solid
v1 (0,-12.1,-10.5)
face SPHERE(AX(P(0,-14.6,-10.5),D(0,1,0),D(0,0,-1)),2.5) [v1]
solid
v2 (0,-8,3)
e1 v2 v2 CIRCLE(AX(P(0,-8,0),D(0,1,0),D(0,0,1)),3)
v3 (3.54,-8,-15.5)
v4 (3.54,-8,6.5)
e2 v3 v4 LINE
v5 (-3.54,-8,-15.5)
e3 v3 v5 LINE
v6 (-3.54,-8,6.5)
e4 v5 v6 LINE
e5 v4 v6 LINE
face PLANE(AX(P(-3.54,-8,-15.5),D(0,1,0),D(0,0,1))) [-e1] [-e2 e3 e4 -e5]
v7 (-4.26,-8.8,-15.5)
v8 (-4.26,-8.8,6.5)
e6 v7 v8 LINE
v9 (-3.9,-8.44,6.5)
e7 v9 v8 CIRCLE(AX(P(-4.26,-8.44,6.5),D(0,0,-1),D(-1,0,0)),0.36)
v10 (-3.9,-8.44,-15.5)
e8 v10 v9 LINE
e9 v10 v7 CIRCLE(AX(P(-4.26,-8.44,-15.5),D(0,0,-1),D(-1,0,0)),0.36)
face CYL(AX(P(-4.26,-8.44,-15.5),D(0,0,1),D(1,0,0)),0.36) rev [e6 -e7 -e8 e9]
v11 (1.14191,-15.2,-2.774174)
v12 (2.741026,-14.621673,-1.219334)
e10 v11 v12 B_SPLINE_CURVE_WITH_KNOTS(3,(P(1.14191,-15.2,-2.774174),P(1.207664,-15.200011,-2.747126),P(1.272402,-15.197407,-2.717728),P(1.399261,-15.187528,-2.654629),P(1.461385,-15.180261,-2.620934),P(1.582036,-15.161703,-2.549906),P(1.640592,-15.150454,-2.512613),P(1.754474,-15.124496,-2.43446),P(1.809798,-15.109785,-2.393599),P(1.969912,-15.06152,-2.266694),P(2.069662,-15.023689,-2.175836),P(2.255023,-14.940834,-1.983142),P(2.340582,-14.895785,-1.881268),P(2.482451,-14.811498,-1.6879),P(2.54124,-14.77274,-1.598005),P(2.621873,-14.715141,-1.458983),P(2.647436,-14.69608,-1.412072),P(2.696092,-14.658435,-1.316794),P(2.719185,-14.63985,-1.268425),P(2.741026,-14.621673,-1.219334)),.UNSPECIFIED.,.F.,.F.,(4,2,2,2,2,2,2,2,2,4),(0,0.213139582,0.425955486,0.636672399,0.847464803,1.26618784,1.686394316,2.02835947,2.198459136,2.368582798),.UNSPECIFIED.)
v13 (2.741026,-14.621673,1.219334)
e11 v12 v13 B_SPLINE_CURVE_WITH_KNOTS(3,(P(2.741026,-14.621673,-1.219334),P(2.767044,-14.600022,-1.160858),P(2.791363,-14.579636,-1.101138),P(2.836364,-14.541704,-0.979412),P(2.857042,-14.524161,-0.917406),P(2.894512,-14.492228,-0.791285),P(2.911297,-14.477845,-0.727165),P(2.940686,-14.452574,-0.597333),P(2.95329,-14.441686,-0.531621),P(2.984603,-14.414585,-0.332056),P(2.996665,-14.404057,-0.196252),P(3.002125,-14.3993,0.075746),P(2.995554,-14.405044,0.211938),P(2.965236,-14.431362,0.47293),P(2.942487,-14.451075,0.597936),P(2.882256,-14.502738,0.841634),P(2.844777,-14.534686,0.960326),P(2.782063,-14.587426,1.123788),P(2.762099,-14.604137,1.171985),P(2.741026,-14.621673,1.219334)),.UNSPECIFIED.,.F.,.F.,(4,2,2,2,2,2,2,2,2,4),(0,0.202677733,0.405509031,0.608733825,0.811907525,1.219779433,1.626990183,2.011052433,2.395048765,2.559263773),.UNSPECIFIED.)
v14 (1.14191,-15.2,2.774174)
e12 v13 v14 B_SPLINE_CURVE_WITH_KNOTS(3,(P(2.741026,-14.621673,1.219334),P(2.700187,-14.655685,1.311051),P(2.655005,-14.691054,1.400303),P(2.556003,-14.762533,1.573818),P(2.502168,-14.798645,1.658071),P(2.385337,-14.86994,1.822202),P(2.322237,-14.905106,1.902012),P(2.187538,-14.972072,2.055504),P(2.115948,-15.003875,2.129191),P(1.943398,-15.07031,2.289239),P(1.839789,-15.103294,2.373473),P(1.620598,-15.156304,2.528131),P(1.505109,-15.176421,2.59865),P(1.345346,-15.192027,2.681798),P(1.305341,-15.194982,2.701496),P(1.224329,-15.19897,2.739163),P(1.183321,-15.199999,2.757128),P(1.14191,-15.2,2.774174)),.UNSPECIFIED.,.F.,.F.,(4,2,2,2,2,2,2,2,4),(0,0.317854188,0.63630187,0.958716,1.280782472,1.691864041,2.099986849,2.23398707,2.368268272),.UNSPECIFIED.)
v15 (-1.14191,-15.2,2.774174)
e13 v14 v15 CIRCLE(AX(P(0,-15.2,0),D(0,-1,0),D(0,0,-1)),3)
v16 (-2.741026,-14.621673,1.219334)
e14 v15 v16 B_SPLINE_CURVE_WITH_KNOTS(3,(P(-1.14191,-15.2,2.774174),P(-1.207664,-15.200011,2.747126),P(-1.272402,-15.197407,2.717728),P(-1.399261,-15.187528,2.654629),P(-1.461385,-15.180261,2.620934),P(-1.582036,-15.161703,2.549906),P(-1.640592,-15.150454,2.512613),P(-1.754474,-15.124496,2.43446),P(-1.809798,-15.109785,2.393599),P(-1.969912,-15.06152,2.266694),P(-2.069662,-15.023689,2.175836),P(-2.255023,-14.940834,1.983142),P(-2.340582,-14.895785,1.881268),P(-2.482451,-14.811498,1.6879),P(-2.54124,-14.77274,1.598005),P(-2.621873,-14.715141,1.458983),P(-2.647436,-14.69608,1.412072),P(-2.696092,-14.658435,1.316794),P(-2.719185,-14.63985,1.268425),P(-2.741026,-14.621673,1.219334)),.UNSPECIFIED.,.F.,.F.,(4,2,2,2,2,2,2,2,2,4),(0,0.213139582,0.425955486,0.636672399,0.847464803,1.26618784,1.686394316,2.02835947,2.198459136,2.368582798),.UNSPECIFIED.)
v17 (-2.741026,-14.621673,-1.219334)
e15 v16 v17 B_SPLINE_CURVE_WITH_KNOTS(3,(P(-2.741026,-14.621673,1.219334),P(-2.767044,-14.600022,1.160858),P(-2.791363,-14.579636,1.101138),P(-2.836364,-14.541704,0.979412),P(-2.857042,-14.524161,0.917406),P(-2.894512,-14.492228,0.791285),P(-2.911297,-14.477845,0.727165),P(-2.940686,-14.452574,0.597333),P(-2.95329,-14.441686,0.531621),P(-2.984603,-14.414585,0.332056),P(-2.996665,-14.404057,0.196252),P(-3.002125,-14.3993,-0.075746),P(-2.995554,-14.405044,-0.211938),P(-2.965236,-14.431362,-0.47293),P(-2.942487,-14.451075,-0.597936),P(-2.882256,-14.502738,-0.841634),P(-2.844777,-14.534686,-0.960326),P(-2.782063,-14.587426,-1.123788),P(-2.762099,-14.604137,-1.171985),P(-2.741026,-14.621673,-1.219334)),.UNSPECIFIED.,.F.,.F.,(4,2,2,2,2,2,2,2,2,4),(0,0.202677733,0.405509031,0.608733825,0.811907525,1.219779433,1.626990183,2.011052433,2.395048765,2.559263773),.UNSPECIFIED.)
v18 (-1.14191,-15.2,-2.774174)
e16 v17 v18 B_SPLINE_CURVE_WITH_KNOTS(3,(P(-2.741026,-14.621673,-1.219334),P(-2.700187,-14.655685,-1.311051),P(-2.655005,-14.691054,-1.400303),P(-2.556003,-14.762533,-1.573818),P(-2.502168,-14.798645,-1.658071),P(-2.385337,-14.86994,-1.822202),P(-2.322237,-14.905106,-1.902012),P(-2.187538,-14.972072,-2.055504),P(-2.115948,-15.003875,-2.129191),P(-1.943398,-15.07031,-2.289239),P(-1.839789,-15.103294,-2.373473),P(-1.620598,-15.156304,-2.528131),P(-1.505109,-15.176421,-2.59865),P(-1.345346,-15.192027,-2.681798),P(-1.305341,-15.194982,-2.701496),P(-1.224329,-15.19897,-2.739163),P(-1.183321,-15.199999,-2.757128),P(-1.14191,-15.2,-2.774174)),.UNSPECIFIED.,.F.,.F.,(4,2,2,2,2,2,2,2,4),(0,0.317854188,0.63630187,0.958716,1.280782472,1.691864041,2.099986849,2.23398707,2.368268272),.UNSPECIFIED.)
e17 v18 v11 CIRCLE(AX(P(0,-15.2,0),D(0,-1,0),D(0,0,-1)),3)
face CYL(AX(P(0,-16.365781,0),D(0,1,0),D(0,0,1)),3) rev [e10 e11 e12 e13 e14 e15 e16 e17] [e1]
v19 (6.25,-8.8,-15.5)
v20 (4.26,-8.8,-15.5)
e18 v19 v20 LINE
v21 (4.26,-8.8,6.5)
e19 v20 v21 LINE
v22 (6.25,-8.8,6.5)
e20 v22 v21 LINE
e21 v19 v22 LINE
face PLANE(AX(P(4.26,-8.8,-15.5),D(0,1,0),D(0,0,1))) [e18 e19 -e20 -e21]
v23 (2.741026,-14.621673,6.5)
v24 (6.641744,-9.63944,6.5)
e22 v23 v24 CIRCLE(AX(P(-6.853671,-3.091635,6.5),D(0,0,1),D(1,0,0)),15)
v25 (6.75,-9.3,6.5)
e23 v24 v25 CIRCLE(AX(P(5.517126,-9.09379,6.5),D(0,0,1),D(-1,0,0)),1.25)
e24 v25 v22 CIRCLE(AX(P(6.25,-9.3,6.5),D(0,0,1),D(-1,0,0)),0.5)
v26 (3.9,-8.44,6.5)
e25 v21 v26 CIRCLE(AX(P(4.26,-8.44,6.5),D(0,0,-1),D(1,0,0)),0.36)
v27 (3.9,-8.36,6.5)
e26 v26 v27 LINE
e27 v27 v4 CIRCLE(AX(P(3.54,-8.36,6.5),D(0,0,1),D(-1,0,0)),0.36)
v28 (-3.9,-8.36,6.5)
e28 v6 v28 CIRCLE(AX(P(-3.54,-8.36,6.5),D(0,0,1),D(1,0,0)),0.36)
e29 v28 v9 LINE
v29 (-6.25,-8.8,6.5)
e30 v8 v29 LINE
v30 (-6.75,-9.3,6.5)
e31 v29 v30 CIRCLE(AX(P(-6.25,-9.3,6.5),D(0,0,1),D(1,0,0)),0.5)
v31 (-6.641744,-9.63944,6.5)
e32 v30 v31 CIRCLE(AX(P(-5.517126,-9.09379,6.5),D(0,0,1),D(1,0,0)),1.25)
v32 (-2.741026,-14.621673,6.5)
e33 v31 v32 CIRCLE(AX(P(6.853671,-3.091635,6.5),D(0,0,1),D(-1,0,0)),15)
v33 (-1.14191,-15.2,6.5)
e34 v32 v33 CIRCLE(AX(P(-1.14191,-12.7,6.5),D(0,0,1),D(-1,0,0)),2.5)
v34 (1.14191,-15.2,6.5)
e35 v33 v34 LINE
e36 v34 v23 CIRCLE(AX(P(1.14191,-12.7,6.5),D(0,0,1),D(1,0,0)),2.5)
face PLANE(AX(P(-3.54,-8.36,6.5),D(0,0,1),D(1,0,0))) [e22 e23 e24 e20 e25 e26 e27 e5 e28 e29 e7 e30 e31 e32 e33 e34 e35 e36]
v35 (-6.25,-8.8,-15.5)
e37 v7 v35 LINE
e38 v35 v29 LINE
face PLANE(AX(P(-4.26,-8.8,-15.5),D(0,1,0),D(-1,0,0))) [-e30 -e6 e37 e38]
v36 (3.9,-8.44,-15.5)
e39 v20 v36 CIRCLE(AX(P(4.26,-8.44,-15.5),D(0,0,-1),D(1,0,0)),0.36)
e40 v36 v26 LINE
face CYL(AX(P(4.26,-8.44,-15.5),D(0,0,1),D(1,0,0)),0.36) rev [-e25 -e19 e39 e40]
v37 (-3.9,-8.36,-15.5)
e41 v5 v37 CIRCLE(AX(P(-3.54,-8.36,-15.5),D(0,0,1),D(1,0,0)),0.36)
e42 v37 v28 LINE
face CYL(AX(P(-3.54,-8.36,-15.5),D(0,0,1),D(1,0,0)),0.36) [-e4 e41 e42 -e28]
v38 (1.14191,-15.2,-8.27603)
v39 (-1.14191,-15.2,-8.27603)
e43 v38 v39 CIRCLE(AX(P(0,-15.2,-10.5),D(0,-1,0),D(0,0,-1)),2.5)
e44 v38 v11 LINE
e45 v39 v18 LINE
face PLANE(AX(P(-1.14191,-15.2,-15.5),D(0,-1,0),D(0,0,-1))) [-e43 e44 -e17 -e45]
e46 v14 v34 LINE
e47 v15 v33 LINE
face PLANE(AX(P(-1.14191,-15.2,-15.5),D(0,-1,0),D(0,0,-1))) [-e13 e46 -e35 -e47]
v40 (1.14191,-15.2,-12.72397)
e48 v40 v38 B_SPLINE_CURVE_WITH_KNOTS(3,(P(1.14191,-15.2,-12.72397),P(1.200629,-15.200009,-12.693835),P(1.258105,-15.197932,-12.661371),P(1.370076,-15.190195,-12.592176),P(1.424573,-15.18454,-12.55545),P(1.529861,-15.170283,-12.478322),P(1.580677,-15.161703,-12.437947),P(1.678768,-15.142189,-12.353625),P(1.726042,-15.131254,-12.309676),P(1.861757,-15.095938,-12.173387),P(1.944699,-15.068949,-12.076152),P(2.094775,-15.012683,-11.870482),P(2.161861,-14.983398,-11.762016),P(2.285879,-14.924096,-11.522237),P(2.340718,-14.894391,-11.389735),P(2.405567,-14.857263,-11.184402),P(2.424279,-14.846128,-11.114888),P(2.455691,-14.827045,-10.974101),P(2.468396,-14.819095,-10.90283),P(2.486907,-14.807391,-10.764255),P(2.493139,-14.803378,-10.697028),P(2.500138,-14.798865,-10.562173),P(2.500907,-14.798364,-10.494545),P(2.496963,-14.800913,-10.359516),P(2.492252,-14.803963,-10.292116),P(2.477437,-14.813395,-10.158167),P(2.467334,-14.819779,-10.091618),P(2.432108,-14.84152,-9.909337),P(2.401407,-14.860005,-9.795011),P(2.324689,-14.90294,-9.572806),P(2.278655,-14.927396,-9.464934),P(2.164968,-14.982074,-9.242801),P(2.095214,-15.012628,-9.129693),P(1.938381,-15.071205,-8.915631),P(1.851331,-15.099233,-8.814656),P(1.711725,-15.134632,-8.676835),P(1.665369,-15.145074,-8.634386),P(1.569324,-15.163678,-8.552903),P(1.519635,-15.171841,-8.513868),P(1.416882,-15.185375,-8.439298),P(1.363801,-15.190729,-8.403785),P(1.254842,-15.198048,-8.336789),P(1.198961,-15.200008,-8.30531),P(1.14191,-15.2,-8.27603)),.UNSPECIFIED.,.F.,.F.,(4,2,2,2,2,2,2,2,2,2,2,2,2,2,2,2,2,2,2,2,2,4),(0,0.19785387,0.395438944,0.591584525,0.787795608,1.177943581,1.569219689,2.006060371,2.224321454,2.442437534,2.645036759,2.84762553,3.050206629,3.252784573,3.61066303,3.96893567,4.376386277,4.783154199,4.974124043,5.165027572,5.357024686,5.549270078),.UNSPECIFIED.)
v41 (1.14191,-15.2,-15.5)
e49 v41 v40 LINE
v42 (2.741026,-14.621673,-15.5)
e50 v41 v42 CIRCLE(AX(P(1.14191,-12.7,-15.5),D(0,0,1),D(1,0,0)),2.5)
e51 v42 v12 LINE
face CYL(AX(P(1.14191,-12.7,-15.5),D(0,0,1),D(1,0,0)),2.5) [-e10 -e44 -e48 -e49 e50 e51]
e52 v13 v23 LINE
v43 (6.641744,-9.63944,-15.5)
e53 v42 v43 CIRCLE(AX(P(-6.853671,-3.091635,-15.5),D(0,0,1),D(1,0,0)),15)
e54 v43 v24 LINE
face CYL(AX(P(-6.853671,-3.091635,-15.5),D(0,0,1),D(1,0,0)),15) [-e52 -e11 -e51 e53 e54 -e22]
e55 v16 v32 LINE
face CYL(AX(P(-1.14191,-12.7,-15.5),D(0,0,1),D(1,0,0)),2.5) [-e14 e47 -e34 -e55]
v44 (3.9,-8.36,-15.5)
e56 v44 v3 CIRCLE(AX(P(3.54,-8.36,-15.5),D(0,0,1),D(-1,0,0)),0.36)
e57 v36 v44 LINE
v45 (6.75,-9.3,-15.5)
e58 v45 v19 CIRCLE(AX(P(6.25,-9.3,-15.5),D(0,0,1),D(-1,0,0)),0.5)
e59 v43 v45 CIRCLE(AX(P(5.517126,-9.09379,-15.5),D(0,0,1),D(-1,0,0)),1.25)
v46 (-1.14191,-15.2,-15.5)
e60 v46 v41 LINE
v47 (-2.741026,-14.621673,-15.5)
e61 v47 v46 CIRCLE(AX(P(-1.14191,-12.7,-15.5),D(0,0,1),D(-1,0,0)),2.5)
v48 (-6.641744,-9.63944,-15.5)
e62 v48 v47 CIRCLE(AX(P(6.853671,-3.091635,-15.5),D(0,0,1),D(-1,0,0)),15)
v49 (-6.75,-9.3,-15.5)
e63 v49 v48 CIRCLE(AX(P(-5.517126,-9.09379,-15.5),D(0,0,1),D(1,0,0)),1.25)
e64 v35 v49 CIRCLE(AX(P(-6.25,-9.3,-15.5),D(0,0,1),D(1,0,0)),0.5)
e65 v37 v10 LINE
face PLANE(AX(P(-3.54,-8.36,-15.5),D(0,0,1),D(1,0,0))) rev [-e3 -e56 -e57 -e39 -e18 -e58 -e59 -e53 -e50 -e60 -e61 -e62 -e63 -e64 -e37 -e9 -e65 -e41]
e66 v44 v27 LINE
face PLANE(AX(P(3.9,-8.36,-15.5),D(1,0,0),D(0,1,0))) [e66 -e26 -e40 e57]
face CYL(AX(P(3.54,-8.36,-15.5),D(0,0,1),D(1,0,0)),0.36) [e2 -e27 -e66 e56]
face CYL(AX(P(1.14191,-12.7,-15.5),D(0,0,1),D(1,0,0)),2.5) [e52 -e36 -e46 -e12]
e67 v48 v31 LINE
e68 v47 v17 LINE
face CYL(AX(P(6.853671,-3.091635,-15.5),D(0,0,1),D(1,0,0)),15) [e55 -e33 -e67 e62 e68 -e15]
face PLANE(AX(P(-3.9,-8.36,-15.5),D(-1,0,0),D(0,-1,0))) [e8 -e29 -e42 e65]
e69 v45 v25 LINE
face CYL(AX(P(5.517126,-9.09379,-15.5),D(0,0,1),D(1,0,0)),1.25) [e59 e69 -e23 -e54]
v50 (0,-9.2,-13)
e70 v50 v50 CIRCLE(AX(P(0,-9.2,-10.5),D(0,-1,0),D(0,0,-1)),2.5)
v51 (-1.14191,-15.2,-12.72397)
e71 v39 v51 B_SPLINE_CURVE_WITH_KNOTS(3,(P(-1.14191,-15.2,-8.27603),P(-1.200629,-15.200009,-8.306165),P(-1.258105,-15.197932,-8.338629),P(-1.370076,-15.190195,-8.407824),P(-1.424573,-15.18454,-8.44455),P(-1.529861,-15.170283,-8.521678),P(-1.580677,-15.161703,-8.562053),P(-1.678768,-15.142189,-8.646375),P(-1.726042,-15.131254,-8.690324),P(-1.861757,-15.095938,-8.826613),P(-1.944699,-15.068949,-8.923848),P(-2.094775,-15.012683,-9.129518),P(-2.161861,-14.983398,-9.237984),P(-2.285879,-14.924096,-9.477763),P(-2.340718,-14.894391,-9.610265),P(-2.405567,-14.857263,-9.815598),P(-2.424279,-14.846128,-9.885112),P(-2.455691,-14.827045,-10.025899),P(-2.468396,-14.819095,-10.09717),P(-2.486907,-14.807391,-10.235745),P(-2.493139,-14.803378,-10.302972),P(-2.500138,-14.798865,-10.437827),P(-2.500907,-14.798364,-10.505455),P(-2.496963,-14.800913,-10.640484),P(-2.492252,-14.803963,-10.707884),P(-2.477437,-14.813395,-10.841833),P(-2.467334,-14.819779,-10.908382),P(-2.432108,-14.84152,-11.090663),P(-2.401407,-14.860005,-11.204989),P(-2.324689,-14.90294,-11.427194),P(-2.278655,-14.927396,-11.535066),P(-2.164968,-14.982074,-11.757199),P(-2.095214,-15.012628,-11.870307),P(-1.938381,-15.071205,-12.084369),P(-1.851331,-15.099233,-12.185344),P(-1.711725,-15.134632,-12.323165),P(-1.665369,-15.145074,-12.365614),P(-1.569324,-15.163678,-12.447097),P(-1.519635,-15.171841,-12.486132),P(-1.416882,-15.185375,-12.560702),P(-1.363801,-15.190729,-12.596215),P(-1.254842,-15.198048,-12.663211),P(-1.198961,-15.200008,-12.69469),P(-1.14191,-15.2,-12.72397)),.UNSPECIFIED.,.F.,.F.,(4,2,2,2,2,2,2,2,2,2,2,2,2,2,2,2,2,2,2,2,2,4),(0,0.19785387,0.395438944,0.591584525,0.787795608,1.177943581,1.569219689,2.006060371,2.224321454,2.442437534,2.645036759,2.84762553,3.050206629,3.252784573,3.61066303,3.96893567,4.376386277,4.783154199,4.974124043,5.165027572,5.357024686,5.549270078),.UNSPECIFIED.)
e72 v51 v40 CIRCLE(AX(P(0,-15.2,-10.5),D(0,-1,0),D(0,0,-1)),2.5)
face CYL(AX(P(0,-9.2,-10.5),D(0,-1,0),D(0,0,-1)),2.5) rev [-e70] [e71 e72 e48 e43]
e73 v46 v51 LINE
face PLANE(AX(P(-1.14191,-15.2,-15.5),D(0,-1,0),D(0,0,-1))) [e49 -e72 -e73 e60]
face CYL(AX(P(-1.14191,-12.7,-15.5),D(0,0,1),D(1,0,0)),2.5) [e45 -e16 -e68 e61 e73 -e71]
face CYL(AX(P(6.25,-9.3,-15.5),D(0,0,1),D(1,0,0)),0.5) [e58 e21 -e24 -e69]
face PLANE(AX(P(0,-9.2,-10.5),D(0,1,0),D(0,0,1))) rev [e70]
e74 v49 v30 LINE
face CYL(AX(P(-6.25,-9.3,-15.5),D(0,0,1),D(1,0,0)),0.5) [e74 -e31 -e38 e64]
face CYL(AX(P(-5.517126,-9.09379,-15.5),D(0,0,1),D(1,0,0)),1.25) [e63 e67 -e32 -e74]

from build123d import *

# Parameters (mm, degrees)
SKETCH1_R           = 3
BOSS_EXTRUDE1_DEPTH = 16
CUT_SWEEP1_PITCH    = 1
SKETCH4_OUTSIDE_W   = 13.622
SKETCH4_OUTSIDE_H   = 13.622
SKETCH4_OUTSIDE_R   = 2.242227772
CUT_EXTRUDE1_DEPTH  = 1
CUT_EXTRUDE1_DRAFT  = -45
CUT_EXTRUDE2_DEPTH  = 2.4
BOSS_EXTRUDE2_START = 6.5
BOSS_EXTRUDE2_DEPTH = 22
SKETCH9_R           = 3
CUT_EXTRUDE4_DEPTH  = 24.276866267
SKETCH10_W          = 2.5
SKETCH10_H          = 6


with BuildPart() as part:
    # Sketch1 → Boss-Extrude1 (new body)
    with BuildSketch(Plane(origin=(0, 0, 0), x_dir=(1, 0, 0), z_dir=(0, 1, 0))):
        with Locations(Location((0, 0, 0), (0, 0, 270))):
            Circle(SKETCH1_R)
    extrude(amount=-BOSS_EXTRUDE1_DEPTH)

    # Cut-Sweep1: arcs per turn and ends read off the stored shape
    # Cut-Sweep1: the profile of Sketch3 screwed along a right-hand helix through 18 turns, 8 arcs to a turn; built about Z, then put on its axis
    cut_sweep1_z = Axis((0, 0, 0), (0, 0, 1))
    cut_sweep1_corners = [(2.350480947, 0, -1.375), (3.054126588, 0, -0.96875), (3.054126588, 0, -1.90625), (2.350480947, 0, -1.5)]
    with BuildLine(mode=Mode.PRIVATE) as cut_sweep1_profile:
        Line(cut_sweep1_corners[0], cut_sweep1_corners[1])
        Line(cut_sweep1_corners[1], cut_sweep1_corners[2])
        Line(cut_sweep1_corners[2], cut_sweep1_corners[3])
        Line(cut_sweep1_corners[3], cut_sweep1_corners[0])
    cut_sweep1_cap = Face(cut_sweep1_profile.wire())
    cut_sweep1_turn_angles = [0, 22.5, 45, 67.5, 90, 112.5, 135, 157.5, 180, 202.5, 225, 247.5, 270, 292.5, 315, 337.5, 360]
    cut_sweep1_turn_weights = [1, 0.9238795325112867, 1, 0.9238795325112867, 1, 0.9238795325112867, 1, 0.9238795325112867, 1, 0.9238795325112867, 1, 0.9238795325112867, 1, 0.9238795325112867, 1, 0.9238795325112867, 1]
    cut_sweep1_turn_rails = [Edge.make_bspline([Vector(p[0], p[1], 0).rotate(cut_sweep1_z, cut_sweep1_turn_angles[k]) / cut_sweep1_turn_weights[k] + Vector(0, 0, p[2] + CUT_SWEEP1_PITCH * cut_sweep1_turn_angles[k] / 360) for k in range(17)], [0, 0, 0, 1, 1, 2, 2, 3, 3, 4, 4, 5, 5, 6, 6, 7, 7, 8, 8, 8], 2, cut_sweep1_turn_weights) for p in cut_sweep1_corners]
    cut_sweep1_turn_sides = [Face.make_surface_from_curves(cut_sweep1_turn_rails[p[0]], cut_sweep1_turn_rails[p[1]]) for p in [(0, 1), (1, 2), (2, 3), (3, 0)]]
    cut_sweep1 = Plane(origin=(0, -16, 0), x_dir=(0, 0, -1), z_dir=(0, 1, 0)) * Solid(Shell([*[p.moved(Location((0, 0, CUT_SWEEP1_PITCH * i))) for i in range(18) for p in cut_sweep1_turn_sides], cut_sweep1_cap, cut_sweep1_cap.rotate(cut_sweep1_z, 6480).moved(Location((0, 0, CUT_SWEEP1_PITCH * 6480 / 360)))]))
    add(cut_sweep1, mode=Mode.SUBTRACT)


with BuildPart() as cut_extrude1_tool:
    # Sketch4 outside → Cut-Extrude1 (with draft: the straight prism first)
    with BuildSketch(Plane.XZ.offset(16)):
        Rectangle(SKETCH4_OUTSIDE_W, SKETCH4_OUTSIDE_H)
        Circle(SKETCH4_OUTSIDE_R, mode=Mode.SUBTRACT)
    extrude(amount=-CUT_EXTRUDE1_DEPTH)
    # Cut-Extrude1: the draft: its side faces are tilted about the plane it starts from
    cut_extrude1_sides = [cut_extrude1_tool.faces().sort_by_distance(p)[0] for p in [
        (0, -15.5, -6.811),
        (6.811, -15.5, 0),
        (0, -15.5, 6.811),
        (-6.811, -15.5, 0),
        (-2.242227772, -15.5, 0),
    ]]
    draft(cut_extrude1_sides, Plane.XZ.offset(16), CUT_EXTRUDE1_DRAFT)


with BuildPart() as part_1:
    add(part.part)

    # Cut-Extrude1: cut by cut_extrude1_tool
    add(cut_extrude1_tool.part, mode=Mode.SUBTRACT)

    # Sketch5 → Revolve1 (revolve)
    with BuildSketch(Plane.XY, mode=Mode.PRIVATE) as revolve1_sk:
        with BuildLine():
            Line((0, 3.3), (0, 0))
            Line((0, 0), (-5.25, 0))
            Line((-5.25, 0), (-5.25, 0.825))
            ThreePointArc((-5.25, 0.825), (-4.306626435, 2.227614941), (-3, 3.3))
            Line((-3, 3.3), (0, 3.3))
        make_face()
    revolve(revolve1_sk.sketch.rotate(Axis((0, 0, 0), (0, -1, 0)), 90), axis=Axis((0, 0, 0), (0, -1, 0)))

    # Sketch6 → Cut-Extrude2 (cut)
    with BuildSketch(Plane(origin=(0, 3.3, 0), x_dir=(1, 0, 0), z_dir=(0, 1, 0))):
        Polygon((0, 2.309401077), (-2, 1.154700538), (-2, -1.154700538), (0, -2.309401077), (2, -1.154700538), (2, 1.154700538), align=None)
    extrude(amount=-CUT_EXTRUDE2_DEPTH, mode=Mode.SUBTRACT)

    # Cut-Extrude3 cone 1 section (through the dimple's axis) → Cut-Extrude3 (revolve, cut)
    with BuildSketch(Plane(origin=(0, 3.3, 0), x_dir=(0, 0, 1), z_dir=(1, 0, 0))):
        Polygon((0, 0), (2.309401077, 0), (0, 2.309401077), align=None)
    revolve(axis=Axis((0, 3.3, 0), (0, -1, 0)), mode=Mode.SUBTRACT)


with BuildPart() as body_2:
    # Sketch8 → Boss-Extrude2 (new body)
    with BuildSketch(Plane.XY.offset(BOSS_EXTRUDE2_START)):
        with BuildLine():
            Line((-1.141910018, -15.2), (1.141910018, -15.2))
            ThreePointArc((1.141910018, -15.2), (1.992150427, -15.050976658), (2.741026302, -14.621672998))
            ThreePointArc((2.741026302, -14.621672998), (4.957086228, -12.338580682), (6.641744362, -9.639440246))
            ThreePointArc((6.641744362, -9.639440246), (6.708027965, -9.473596894), (6.75, -9.3))
            ThreePointArc((6.75, -9.3), (6.603553391, -8.946446609), (6.25, -8.8))
            Line((6.25, -8.8), (4.26, -8.8))
            ThreePointArc((4.26, -8.8), (4.005441559, -8.694558441), (3.9, -8.44))
            Line((3.9, -8.44), (3.9, -8.36))
            ThreePointArc((3.9, -8.36), (3.794558441, -8.105441559), (3.54, -8))
            Line((3.54, -8), (-3.54, -8))
            ThreePointArc((-3.54, -8), (-3.794558441, -8.105441559), (-3.9, -8.36))
            Line((-3.9, -8.36), (-3.9, -8.44))
            ThreePointArc((-3.9, -8.44), (-4.005441559, -8.694558441), (-4.26, -8.8))
            Line((-4.26, -8.8), (-6.25, -8.8))
            ThreePointArc((-6.25, -8.8), (-6.603553391, -8.946446609), (-6.75, -9.3))
            ThreePointArc((-6.75, -9.3), (-6.708027965, -9.473596894), (-6.641744362, -9.639440246))
            ThreePointArc((-6.641744362, -9.639440246), (-4.957086228, -12.338580682), (-2.741026302, -14.621672998))
            ThreePointArc((-2.741026302, -14.621672998), (-1.992150427, -15.050976658), (-1.141910018, -15.2))
        make_face()
    extrude(amount=-BOSS_EXTRUDE2_DEPTH)

    # Sketch9 → Cut-Extrude4 (cut, through all)
    with BuildSketch(Plane(origin=(0, 0, 0), x_dir=(1, 0, 0), z_dir=(0, 1, 0))):
        with Locations(Location((0, 0, 0), (0, 0, 270))):
            Circle(SKETCH9_R)
    extrude(amount=-CUT_EXTRUDE4_DEPTH, mode=Mode.SUBTRACT)

    # Sketch10 → Cut-Revolve1 (revolve, cut)
    with BuildSketch(Plane(origin=(0, 0, 0), x_dir=(0, 0, -1), z_dir=(1, 0, 0))):
        with Locations((11.75, -12.2)):
            Rectangle(SKETCH10_W, SKETCH10_H)
    revolve(axis=Axis((0, -9.2, -10.5), (0, 1, 0)), mode=Mode.SUBTRACT)


with BuildPart() as body_3:
    # Sketch11 → Revolve2 (revolve)
    with BuildSketch(Plane(origin=(0, 0, 0), x_dir=(0, 0, -1), z_dir=(1, 0, 0))):
        with BuildLine():
            Line((10.5, -12.1), (10.5, -17.1))
            ThreePointArc((10.5, -17.1), (13, -14.6), (10.5, -12.1))
        make_face()
    revolve(axis=Axis((0, -12.1, -10.5), (0, -1, 0)))


solid = Compound([body_2.part, body_3.part])
